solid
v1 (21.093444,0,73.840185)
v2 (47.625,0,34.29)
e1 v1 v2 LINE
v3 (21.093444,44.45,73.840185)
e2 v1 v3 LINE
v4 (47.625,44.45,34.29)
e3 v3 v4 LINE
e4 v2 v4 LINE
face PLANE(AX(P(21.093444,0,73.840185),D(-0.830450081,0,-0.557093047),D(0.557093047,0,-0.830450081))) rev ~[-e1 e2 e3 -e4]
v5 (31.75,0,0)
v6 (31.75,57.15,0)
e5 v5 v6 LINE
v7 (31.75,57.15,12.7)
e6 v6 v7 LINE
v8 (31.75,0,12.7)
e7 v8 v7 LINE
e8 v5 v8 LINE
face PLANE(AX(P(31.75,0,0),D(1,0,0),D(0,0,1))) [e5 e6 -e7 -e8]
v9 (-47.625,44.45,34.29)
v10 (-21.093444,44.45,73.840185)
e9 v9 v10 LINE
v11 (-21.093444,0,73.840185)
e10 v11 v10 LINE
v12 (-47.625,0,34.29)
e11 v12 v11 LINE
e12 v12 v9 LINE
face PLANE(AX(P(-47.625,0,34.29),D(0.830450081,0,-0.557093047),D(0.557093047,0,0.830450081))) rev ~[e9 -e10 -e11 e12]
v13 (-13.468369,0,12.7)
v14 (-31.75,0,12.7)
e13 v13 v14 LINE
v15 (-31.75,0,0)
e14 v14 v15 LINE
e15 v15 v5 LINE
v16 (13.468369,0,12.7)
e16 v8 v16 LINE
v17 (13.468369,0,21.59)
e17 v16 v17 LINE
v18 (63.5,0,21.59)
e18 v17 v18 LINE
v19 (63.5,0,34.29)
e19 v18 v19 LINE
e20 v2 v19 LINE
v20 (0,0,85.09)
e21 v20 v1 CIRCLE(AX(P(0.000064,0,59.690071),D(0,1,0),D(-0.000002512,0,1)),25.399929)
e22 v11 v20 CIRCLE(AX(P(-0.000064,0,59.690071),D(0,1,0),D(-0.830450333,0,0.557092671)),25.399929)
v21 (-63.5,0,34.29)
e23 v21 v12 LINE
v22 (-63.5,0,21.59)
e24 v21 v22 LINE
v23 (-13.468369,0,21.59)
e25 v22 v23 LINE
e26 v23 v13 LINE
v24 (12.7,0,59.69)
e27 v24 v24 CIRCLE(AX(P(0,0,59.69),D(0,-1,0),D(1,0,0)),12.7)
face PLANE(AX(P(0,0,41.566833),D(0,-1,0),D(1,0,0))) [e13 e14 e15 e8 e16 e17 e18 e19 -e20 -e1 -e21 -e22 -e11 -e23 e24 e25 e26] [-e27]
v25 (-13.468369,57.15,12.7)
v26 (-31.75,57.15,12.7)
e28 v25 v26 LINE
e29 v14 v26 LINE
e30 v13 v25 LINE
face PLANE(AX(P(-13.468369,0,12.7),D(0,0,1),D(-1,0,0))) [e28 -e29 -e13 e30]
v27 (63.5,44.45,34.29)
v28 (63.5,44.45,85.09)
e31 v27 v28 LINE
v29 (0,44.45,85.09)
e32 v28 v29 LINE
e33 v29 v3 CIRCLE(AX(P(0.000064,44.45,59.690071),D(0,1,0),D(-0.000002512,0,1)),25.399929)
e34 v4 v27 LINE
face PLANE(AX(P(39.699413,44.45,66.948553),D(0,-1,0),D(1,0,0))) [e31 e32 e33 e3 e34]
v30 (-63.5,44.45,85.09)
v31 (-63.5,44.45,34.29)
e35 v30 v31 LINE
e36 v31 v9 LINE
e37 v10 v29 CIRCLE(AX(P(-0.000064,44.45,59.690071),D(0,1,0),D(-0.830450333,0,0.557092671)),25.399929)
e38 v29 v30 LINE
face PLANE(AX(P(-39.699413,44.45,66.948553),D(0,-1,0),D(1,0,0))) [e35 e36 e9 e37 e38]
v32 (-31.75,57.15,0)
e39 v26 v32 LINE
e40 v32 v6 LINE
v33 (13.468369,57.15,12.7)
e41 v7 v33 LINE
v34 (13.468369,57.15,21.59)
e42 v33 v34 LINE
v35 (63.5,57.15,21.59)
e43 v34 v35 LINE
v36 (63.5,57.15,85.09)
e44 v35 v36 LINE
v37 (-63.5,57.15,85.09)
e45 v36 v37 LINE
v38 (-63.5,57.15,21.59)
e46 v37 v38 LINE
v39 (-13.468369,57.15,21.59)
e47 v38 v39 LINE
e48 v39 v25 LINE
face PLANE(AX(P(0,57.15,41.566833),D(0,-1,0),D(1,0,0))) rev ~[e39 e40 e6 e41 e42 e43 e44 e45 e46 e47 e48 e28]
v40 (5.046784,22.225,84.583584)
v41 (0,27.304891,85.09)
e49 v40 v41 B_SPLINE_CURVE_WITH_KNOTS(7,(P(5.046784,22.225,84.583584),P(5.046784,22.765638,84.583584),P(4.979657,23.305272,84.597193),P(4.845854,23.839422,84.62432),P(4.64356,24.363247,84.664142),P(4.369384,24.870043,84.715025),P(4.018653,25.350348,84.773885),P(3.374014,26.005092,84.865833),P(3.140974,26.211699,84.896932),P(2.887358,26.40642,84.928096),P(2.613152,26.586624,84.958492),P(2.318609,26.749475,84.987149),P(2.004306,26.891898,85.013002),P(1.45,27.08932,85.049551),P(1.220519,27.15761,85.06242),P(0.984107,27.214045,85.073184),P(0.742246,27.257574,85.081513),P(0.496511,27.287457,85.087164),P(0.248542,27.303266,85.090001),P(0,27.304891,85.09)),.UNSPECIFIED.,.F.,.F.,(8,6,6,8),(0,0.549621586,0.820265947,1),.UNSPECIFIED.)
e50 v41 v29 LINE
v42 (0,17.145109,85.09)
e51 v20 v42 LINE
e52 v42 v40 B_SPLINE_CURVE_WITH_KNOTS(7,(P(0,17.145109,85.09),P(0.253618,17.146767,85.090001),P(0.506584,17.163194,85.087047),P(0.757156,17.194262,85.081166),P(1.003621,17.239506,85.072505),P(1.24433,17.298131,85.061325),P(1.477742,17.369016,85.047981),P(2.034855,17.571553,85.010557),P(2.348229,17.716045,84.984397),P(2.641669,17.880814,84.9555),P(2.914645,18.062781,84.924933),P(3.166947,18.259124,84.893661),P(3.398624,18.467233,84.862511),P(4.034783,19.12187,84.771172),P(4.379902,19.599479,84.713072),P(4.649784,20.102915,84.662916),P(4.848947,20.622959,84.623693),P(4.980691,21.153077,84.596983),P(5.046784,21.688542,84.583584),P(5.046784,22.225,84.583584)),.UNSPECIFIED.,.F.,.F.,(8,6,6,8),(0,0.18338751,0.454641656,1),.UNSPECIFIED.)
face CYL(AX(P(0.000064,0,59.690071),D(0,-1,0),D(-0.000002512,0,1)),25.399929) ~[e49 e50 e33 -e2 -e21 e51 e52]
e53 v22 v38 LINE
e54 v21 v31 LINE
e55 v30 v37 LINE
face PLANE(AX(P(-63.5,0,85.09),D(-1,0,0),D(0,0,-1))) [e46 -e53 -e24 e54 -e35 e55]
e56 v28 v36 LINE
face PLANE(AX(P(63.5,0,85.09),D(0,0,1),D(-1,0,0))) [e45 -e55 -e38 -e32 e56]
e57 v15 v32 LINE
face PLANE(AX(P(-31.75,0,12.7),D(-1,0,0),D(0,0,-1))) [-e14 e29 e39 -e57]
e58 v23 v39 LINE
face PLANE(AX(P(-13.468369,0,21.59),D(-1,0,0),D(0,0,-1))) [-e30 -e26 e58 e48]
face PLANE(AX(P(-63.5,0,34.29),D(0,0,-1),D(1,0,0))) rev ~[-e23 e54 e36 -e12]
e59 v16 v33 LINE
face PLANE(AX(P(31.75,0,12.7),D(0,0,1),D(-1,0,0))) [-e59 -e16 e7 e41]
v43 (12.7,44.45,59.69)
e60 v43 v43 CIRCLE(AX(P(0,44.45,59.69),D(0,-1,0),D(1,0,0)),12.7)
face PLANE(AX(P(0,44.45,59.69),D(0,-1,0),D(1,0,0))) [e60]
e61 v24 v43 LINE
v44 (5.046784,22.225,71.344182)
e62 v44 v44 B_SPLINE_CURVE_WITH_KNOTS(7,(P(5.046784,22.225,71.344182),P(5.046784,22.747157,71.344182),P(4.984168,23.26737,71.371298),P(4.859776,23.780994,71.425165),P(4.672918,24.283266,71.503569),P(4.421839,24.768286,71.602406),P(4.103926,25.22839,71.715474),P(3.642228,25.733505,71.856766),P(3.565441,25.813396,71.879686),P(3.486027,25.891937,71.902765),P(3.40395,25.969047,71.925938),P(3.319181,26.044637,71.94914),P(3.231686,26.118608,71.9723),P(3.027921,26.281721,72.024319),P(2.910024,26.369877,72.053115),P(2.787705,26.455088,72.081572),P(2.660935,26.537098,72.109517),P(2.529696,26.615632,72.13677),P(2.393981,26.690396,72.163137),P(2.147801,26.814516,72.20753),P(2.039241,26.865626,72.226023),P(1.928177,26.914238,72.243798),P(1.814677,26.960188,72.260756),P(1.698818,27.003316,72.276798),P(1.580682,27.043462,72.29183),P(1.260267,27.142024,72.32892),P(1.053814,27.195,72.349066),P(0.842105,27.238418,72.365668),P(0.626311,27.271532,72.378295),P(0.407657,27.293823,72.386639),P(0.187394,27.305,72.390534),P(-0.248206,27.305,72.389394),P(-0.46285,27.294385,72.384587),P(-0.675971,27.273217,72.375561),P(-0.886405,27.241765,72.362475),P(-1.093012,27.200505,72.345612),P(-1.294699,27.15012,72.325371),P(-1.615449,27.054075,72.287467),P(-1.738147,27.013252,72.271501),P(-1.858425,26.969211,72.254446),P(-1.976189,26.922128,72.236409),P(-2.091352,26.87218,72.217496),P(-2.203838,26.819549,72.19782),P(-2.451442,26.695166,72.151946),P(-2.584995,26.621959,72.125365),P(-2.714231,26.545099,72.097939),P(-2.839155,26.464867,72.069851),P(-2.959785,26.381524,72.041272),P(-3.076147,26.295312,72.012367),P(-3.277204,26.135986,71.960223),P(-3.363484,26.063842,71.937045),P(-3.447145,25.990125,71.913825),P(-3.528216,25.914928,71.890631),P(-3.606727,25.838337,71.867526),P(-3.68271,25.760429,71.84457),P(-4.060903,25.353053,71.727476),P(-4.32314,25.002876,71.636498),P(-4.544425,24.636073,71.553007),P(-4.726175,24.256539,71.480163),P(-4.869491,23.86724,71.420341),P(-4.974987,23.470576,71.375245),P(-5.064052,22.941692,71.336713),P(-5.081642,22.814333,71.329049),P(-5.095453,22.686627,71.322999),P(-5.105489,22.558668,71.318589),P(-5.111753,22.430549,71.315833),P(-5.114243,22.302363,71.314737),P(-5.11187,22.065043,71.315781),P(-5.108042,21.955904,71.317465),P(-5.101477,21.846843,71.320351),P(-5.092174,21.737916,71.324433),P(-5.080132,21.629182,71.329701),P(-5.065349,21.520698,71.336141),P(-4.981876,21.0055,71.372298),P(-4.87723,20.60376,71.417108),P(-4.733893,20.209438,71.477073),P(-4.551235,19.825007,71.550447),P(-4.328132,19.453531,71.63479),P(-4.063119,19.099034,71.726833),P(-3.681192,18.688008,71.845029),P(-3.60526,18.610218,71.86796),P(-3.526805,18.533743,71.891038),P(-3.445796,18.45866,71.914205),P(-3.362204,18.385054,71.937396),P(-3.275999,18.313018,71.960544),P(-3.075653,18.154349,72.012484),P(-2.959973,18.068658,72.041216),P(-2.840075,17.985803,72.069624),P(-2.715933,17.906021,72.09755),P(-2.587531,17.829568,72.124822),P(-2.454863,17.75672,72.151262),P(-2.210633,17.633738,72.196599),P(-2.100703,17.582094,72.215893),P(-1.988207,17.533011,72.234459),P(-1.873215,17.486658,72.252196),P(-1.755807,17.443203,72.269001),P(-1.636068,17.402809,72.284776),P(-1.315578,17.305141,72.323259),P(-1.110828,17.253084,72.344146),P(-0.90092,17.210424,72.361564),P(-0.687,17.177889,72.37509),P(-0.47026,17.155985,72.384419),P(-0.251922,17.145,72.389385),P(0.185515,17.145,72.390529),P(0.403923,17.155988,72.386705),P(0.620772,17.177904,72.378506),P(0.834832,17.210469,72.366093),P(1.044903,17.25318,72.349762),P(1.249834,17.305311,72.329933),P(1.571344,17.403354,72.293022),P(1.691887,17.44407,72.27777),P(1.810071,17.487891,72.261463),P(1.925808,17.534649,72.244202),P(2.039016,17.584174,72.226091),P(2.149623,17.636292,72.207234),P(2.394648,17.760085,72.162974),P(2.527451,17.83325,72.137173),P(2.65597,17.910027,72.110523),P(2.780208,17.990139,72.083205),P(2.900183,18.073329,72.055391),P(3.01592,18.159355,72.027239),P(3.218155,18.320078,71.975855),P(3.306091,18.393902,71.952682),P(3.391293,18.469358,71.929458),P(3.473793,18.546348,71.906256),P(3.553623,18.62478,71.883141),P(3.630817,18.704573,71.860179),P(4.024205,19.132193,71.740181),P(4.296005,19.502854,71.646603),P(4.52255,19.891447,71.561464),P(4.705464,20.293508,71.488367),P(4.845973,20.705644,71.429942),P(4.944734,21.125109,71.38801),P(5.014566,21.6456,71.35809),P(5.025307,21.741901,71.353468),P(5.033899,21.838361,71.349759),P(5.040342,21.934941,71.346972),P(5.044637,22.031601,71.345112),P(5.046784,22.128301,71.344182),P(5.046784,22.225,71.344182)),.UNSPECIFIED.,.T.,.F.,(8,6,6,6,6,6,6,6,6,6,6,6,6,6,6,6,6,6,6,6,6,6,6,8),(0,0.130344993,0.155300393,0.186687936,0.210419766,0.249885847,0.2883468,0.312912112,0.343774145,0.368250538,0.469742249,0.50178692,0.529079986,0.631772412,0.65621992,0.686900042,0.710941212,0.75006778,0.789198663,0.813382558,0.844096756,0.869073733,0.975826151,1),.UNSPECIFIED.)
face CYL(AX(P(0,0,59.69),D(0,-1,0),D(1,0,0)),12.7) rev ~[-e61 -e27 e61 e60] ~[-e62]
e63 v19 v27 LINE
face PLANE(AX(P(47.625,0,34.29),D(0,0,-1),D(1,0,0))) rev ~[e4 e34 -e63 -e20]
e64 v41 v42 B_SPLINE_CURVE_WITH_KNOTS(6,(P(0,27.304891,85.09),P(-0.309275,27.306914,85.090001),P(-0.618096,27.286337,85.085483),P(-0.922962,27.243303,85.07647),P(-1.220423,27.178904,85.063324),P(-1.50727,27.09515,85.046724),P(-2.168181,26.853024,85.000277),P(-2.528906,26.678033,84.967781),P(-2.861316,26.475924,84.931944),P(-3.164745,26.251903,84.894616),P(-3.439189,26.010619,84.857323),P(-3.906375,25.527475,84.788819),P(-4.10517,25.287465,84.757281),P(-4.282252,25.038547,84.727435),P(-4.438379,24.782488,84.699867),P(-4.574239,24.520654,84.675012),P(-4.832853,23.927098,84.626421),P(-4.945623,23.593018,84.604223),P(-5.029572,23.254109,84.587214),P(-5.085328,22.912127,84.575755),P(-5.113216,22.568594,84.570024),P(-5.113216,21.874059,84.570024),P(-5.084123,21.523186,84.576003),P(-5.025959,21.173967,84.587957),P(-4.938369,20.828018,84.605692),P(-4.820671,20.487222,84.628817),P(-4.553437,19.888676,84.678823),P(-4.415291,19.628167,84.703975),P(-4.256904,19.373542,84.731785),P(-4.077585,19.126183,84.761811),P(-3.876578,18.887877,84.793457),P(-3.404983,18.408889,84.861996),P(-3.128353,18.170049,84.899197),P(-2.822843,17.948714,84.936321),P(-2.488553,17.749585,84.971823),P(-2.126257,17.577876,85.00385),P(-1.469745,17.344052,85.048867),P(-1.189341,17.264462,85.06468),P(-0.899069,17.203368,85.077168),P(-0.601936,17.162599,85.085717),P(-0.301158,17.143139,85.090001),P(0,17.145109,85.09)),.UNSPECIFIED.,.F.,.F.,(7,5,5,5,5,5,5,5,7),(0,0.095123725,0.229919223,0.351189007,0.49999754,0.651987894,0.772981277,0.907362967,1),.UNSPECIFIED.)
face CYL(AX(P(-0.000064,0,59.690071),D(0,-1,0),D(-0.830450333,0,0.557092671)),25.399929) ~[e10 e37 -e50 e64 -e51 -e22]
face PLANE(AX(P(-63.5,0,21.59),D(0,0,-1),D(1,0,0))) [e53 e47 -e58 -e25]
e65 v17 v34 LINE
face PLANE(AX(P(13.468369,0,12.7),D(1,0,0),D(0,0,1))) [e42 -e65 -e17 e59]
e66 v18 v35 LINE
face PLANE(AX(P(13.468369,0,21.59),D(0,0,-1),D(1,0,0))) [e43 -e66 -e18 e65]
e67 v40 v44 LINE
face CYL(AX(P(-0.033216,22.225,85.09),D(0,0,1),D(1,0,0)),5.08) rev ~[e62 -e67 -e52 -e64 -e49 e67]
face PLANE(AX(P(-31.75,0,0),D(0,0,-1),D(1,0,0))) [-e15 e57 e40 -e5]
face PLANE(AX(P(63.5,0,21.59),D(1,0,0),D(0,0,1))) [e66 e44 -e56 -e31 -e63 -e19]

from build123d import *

# Parameters (mm, degrees)
F1_DEPTH = 57.15
F2_R     = 12.7
F3_DEPTH = 44.45
F4_R     = 5.08
F5_DEPTH = 13.7758108493


# Not quite as in the source:
# - ends of sketch curves that miss each other by under 0.0002 mm in the source are joined


with BuildPart() as f1:
    # F0 (on Front) → F1 (new body)
    with BuildSketch(Plane.XZ):
        Polygon((-31.75, 0), (31.75, 0), (31.75, 12.7), (13.4683688998, 12.7), (13.4683688998, 21.59), (63.5, 21.59), (63.5, 85.09), (-63.5, 85.09), (-63.5, 21.59), (-13.4683688998, 21.59), (-13.4683688998, 12.7), (-31.75, 12.7), align=None)
    extrude(amount=-F1_DEPTH)

    # F2 (on face) → F3 (cut)
    with BuildSketch(Plane.XZ):
        with BuildLine():
            Line((0, 85.09), (-63.5, 85.09))
            Line((-63.5, 85.09), (-63.5, 34.29))
            Line((-63.5, 34.29), (-47.625, 34.29))
            Line((-47.625, 34.29), (-21.0934436414, 73.8401851094))
            ThreePointArc((-21.0934436414, 73.8401851094), (-11.9529513968, 82.101783869), (0, 85.09))
        make_face()
        with Locations((0, 59.69)):
            Circle(F2_R)
        with BuildLine():
            Line((63.5, 85.09), (0, 85.09))
            ThreePointArc((0, 85.09), (11.9529513968, 82.101783869), (21.0934436414, 73.8401851094))
            Line((21.0934436414, 73.8401851094), (47.625, 34.29))
            Line((47.625, 34.29), (63.5, 34.29))
            Line((63.5, 34.29), (63.5, 85.09))
        make_face()
    extrude(amount=-F3_DEPTH, mode=Mode.SUBTRACT)

    # F4 (on face) → F5 (cut, through all)
    with BuildSketch(Plane.XY.offset(85.09)):
        with Locations((-0.0332157188, 22.225)):
            Circle(F4_R)
    extrude(amount=-F5_DEPTH, mode=Mode.SUBTRACT)


solid = f1.part
